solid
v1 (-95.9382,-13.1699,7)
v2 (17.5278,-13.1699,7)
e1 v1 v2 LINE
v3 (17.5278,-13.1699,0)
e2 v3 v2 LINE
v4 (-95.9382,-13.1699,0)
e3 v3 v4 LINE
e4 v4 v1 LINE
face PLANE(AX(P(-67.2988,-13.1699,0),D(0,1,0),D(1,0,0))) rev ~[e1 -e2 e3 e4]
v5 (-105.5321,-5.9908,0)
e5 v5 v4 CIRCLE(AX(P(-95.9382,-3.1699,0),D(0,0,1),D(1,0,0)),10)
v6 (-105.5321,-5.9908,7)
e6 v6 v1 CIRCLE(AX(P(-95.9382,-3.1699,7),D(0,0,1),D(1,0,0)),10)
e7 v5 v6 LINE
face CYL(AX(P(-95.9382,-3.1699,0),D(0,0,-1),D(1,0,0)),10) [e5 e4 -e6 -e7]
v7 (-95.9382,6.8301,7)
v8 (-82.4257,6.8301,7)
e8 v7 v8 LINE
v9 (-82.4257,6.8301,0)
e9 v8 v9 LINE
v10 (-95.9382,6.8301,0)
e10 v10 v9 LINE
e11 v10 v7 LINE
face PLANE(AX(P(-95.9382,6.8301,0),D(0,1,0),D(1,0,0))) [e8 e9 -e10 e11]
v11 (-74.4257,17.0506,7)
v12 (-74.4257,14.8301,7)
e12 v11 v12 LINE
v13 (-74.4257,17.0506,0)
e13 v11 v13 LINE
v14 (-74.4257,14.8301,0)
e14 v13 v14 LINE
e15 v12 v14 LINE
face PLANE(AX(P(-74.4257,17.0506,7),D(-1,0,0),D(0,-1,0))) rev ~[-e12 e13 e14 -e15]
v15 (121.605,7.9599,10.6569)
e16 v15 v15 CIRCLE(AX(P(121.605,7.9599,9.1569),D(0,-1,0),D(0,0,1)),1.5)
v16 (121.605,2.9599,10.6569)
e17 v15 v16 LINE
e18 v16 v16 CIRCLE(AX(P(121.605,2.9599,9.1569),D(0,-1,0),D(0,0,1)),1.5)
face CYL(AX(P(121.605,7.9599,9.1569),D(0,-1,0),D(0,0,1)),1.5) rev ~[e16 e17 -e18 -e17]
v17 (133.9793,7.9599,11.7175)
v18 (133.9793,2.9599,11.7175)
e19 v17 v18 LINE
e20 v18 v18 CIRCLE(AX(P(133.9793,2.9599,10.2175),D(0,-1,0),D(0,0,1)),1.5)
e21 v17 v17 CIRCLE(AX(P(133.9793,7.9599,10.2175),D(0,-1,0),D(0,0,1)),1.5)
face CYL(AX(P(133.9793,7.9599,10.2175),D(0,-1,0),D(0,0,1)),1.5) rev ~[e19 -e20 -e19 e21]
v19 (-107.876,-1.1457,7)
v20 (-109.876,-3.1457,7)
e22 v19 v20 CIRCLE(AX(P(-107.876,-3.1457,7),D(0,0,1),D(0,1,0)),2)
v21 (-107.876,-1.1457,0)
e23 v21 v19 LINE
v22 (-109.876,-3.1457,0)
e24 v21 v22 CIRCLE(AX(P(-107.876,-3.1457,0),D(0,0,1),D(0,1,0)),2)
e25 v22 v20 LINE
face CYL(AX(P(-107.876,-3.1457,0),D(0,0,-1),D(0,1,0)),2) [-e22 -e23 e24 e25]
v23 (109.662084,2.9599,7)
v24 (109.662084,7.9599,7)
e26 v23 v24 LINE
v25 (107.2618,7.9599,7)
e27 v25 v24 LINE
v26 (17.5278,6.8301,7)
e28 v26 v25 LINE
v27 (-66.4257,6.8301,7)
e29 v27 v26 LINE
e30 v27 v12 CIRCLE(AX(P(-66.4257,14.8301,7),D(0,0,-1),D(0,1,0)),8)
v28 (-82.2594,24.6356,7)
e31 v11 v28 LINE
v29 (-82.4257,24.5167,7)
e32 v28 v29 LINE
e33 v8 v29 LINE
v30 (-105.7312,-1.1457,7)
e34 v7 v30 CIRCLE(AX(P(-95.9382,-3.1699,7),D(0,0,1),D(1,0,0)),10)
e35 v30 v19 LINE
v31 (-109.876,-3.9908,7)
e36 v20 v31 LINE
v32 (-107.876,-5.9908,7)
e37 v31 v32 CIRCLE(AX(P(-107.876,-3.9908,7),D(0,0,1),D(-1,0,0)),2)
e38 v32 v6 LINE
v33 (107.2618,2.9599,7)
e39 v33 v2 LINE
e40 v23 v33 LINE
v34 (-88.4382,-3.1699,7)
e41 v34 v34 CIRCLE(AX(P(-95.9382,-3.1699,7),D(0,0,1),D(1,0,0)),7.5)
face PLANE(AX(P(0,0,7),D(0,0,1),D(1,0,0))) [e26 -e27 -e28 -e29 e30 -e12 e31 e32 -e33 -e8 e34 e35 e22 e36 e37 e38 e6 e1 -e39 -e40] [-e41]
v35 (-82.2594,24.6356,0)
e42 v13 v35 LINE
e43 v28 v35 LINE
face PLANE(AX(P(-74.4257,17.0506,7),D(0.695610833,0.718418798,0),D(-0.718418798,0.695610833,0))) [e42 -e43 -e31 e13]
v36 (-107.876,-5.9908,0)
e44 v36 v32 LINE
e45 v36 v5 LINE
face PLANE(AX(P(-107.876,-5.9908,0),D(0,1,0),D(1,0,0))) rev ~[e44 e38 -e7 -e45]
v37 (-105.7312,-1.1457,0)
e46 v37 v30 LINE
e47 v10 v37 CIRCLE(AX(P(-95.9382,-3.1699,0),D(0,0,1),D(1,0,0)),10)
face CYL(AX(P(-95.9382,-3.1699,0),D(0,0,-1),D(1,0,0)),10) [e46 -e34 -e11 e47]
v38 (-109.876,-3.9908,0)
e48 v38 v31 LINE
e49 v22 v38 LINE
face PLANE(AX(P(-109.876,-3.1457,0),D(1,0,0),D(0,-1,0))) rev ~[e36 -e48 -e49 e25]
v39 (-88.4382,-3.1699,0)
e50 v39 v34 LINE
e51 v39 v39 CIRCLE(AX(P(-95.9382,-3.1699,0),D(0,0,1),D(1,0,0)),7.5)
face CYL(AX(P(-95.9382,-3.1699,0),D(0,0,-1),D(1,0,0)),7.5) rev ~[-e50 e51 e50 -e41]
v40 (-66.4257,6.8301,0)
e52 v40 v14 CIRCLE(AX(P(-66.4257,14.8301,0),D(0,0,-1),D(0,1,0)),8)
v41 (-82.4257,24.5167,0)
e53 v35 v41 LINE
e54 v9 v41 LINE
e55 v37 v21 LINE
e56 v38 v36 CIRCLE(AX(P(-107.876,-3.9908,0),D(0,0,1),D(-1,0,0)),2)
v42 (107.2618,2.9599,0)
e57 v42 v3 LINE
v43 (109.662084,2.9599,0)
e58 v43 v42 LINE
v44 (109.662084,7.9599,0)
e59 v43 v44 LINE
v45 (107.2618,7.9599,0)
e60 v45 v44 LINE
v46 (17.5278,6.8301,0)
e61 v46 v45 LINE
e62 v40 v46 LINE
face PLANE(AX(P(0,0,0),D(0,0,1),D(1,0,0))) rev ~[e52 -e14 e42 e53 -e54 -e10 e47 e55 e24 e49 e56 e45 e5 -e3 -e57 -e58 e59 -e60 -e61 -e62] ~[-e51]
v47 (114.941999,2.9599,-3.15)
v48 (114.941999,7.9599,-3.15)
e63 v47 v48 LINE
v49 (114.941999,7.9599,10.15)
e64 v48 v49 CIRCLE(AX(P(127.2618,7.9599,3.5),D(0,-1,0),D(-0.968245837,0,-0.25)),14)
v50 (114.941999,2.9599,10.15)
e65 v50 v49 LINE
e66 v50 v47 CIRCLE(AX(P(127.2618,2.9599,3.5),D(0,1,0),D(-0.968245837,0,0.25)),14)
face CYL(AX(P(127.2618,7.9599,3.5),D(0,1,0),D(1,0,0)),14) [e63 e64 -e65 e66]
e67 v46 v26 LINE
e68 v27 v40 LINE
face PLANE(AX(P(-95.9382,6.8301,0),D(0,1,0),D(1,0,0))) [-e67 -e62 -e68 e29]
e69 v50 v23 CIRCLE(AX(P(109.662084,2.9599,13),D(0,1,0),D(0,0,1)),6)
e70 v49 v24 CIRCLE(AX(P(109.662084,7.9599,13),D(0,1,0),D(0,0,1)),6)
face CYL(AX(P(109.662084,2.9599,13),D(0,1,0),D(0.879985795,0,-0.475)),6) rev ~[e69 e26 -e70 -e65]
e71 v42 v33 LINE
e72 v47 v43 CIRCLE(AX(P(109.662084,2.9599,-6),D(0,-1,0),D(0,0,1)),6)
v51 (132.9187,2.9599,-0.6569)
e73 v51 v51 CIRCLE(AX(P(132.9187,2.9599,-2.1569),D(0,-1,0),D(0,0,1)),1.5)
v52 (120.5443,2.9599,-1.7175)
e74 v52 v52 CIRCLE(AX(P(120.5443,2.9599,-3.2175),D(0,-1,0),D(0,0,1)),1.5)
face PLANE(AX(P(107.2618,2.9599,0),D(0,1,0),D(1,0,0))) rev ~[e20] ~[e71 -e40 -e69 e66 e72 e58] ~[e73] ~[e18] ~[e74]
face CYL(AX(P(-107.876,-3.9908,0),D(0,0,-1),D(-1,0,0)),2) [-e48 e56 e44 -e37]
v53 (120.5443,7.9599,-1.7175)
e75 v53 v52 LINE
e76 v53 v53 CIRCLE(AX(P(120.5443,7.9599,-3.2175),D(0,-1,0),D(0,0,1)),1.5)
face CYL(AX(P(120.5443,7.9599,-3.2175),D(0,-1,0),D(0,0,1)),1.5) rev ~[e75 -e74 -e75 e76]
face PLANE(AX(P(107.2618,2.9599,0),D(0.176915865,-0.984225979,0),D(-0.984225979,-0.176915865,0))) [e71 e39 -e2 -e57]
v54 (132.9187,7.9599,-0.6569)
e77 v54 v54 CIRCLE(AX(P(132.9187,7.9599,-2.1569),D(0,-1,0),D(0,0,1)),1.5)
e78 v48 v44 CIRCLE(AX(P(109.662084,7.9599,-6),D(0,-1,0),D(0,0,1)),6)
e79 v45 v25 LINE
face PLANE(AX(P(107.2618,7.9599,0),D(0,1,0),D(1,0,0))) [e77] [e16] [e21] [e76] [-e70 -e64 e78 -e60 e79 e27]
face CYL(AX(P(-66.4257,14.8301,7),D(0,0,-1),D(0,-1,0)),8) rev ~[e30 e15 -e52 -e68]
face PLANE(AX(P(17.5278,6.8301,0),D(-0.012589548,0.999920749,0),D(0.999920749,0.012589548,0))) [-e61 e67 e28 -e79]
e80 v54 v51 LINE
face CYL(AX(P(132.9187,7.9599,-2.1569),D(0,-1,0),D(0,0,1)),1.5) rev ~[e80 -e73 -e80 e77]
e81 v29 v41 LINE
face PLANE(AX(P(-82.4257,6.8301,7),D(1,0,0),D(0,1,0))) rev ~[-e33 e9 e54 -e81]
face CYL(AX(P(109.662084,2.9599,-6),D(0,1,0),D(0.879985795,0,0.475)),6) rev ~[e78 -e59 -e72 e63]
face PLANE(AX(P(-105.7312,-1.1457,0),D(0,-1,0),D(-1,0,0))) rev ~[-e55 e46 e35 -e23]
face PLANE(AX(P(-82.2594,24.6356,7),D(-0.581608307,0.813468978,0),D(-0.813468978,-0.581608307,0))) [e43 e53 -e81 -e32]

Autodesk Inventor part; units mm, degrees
ref_plane "YZ Plane" through (0, 0, 0) normal (1, 0, 0) x (0, 1, 0)
ref_plane "XZ Plane" through (0, 0, 0) normal (0, 1, 0) x (-1, 0, 0)
ref_plane "XY Plane" through (0, 0, 0) normal (0, 0, 1) x (1, 0, 0)
sketch "Sketch1" plane through (0, 0, 0) normal (0, 0, 1) x (1, 0, 0)
  line L0 (107.2618, 7.9599) -> (127.2618, 7.9599)
  line L1 (127.2618, 7.9599) -> (127.2618, 2.9599)
  line L2 (127.2618, 2.9599) -> (107.2618, 2.9599)
  line L3 (107.2618, 2.9599) -> (107.2618, 7.9599)
  circle A0 centre (-95.9382, -3.1699) radius 7.5
  circle A1 centre (-95.9382, -3.1699) radius 10
  line L4 (-95.9382, -13.1699) -> (-67.2988, -13.1699)
  line L5 (-67.2988, -13.1699) -> (17.5278, -13.1699)
  line L6 (107.2618, 2.9599) -> (17.5278, -13.1699)
  line L7 (-95.9382, 6.8301) -> (17.5278, 6.8301)
  line L8 (17.5278, 6.8301) -> (107.2618, 7.9599)
  line L9 (-105.7312, -1.1457) -> (-107.876, -1.1457)
  line L10 (-109.876, -3.1457) -> (-109.876, -3.9908)
  line L11 (-107.876, -5.9908) -> (-105.5321, -5.9908)
  arc A2 (-107.876, -1.1457) -> (-109.876, -3.1457) centre (-107.876, -3.1457) ccw
  arc A3 (-109.876, -3.9908) -> (-107.876, -5.9908) centre (-107.876, -3.9908) ccw
  point P0 (0, 0)
  point P1 (107.2618, 5.4599)
  point P2 (-109.876, -5.9908)
  point P3 (-109.876, -1.1457)
  dimension "d0" = 20
  dimension "d1" = 15
  dimension "d2" = 203.2
  dimension "d3" = 20
  dimension "d4" = 5
  dimension "d43" = 2
extrude "Extrusion1" add sketch "Sketch1" along normal blind 7
sketch "Sketch2" plane through (107.2618, 7.9599, 0) normal (0, 1, 0) x (1, 0, 0)
  line L0 (20, 0) -> (20, -7) projected
  circle A0 centre (20, -3.5) radius 14
  circle A1 centre (20, -3.5) radius 9.5 construction
  circle A2 centre (20, -3.5) radius 8 construction
  line L1 (20, -3.5) -> (29.8995, 6.3995) construction
  line L2 (20, -3.5) -> (34, -3.5) construction
  line L3 (20, -3.5) -> (10.1005, 6.3995) construction
  line L4 (20, -3.5) -> (10.1005, -13.3995) construction
  line L5 (20, -3.5) -> (29.8995, -13.3995) construction
  point P0 (-107.2618, 0)
  point P1 (13.2825, 3.2175)
  point P2 (26.7175, -10.2175)
  point P3 (25.6569, 2.1569)
  point P4 (14.3431, -9.1569)
  dimension "d7" = 28
  dimension "d8" = 19
  dimension "d9" = 16
  dimension "d10" = 45
extrude "Extrusion2" add sketch "Sketch2" against normal blind 5
hole "Hole1" at (120.5443, 7.9599, -3.2175) at (133.9793, 7.9599, 10.2175) at (132.9187, 7.9599, -2.1569) at (121.605, 7.9599, 9.1569) direction (0, -1, 0) diameter 3 end through all
fillet "Fillet1" radius 6 2 edges at (113.7064, 5.4599, 7) (113.7064, 5.4599, 0)
sketch "Sketch4" plane through (0, 0, 7) normal (0, 0, 1) x (1, 0, 0)
  line L0 (17.5278, 6.8301) -> (-95.9382, 6.8301) projected
  line L1 (-76.1299, 6.8301) -> (-50.7299, 6.8301) construction
  line L2 (-74.4257, 17.0506) -> (-74.4257, 6.8301)
  line L3 (-76.1299, 6.8301) -> (-74.4257, 6.8301)
  line L4 (-74.4257, 6.8301) -> (-82.4257, 6.8301)
  line L5 (-82.4257, 6.8301) -> (-82.4257, 24.5167)
  line L6 (-74.4257, 17.0506) -> (-82.2594, 24.6356)
  line L7 (-82.2594, 24.6356) -> (-82.4257, 24.5167)
  point P0 (0, 0)
  dimension "d42" = 8
extrude "Extrusion4" add sketch "Sketch4" against normal up to surface (7 mm away)
fillet "Fillet3" radius 8 1 edges at (-74.4257, 6.8301, 3.5)
properties part number "BOOM ARM" material "Aluminum 6061"
